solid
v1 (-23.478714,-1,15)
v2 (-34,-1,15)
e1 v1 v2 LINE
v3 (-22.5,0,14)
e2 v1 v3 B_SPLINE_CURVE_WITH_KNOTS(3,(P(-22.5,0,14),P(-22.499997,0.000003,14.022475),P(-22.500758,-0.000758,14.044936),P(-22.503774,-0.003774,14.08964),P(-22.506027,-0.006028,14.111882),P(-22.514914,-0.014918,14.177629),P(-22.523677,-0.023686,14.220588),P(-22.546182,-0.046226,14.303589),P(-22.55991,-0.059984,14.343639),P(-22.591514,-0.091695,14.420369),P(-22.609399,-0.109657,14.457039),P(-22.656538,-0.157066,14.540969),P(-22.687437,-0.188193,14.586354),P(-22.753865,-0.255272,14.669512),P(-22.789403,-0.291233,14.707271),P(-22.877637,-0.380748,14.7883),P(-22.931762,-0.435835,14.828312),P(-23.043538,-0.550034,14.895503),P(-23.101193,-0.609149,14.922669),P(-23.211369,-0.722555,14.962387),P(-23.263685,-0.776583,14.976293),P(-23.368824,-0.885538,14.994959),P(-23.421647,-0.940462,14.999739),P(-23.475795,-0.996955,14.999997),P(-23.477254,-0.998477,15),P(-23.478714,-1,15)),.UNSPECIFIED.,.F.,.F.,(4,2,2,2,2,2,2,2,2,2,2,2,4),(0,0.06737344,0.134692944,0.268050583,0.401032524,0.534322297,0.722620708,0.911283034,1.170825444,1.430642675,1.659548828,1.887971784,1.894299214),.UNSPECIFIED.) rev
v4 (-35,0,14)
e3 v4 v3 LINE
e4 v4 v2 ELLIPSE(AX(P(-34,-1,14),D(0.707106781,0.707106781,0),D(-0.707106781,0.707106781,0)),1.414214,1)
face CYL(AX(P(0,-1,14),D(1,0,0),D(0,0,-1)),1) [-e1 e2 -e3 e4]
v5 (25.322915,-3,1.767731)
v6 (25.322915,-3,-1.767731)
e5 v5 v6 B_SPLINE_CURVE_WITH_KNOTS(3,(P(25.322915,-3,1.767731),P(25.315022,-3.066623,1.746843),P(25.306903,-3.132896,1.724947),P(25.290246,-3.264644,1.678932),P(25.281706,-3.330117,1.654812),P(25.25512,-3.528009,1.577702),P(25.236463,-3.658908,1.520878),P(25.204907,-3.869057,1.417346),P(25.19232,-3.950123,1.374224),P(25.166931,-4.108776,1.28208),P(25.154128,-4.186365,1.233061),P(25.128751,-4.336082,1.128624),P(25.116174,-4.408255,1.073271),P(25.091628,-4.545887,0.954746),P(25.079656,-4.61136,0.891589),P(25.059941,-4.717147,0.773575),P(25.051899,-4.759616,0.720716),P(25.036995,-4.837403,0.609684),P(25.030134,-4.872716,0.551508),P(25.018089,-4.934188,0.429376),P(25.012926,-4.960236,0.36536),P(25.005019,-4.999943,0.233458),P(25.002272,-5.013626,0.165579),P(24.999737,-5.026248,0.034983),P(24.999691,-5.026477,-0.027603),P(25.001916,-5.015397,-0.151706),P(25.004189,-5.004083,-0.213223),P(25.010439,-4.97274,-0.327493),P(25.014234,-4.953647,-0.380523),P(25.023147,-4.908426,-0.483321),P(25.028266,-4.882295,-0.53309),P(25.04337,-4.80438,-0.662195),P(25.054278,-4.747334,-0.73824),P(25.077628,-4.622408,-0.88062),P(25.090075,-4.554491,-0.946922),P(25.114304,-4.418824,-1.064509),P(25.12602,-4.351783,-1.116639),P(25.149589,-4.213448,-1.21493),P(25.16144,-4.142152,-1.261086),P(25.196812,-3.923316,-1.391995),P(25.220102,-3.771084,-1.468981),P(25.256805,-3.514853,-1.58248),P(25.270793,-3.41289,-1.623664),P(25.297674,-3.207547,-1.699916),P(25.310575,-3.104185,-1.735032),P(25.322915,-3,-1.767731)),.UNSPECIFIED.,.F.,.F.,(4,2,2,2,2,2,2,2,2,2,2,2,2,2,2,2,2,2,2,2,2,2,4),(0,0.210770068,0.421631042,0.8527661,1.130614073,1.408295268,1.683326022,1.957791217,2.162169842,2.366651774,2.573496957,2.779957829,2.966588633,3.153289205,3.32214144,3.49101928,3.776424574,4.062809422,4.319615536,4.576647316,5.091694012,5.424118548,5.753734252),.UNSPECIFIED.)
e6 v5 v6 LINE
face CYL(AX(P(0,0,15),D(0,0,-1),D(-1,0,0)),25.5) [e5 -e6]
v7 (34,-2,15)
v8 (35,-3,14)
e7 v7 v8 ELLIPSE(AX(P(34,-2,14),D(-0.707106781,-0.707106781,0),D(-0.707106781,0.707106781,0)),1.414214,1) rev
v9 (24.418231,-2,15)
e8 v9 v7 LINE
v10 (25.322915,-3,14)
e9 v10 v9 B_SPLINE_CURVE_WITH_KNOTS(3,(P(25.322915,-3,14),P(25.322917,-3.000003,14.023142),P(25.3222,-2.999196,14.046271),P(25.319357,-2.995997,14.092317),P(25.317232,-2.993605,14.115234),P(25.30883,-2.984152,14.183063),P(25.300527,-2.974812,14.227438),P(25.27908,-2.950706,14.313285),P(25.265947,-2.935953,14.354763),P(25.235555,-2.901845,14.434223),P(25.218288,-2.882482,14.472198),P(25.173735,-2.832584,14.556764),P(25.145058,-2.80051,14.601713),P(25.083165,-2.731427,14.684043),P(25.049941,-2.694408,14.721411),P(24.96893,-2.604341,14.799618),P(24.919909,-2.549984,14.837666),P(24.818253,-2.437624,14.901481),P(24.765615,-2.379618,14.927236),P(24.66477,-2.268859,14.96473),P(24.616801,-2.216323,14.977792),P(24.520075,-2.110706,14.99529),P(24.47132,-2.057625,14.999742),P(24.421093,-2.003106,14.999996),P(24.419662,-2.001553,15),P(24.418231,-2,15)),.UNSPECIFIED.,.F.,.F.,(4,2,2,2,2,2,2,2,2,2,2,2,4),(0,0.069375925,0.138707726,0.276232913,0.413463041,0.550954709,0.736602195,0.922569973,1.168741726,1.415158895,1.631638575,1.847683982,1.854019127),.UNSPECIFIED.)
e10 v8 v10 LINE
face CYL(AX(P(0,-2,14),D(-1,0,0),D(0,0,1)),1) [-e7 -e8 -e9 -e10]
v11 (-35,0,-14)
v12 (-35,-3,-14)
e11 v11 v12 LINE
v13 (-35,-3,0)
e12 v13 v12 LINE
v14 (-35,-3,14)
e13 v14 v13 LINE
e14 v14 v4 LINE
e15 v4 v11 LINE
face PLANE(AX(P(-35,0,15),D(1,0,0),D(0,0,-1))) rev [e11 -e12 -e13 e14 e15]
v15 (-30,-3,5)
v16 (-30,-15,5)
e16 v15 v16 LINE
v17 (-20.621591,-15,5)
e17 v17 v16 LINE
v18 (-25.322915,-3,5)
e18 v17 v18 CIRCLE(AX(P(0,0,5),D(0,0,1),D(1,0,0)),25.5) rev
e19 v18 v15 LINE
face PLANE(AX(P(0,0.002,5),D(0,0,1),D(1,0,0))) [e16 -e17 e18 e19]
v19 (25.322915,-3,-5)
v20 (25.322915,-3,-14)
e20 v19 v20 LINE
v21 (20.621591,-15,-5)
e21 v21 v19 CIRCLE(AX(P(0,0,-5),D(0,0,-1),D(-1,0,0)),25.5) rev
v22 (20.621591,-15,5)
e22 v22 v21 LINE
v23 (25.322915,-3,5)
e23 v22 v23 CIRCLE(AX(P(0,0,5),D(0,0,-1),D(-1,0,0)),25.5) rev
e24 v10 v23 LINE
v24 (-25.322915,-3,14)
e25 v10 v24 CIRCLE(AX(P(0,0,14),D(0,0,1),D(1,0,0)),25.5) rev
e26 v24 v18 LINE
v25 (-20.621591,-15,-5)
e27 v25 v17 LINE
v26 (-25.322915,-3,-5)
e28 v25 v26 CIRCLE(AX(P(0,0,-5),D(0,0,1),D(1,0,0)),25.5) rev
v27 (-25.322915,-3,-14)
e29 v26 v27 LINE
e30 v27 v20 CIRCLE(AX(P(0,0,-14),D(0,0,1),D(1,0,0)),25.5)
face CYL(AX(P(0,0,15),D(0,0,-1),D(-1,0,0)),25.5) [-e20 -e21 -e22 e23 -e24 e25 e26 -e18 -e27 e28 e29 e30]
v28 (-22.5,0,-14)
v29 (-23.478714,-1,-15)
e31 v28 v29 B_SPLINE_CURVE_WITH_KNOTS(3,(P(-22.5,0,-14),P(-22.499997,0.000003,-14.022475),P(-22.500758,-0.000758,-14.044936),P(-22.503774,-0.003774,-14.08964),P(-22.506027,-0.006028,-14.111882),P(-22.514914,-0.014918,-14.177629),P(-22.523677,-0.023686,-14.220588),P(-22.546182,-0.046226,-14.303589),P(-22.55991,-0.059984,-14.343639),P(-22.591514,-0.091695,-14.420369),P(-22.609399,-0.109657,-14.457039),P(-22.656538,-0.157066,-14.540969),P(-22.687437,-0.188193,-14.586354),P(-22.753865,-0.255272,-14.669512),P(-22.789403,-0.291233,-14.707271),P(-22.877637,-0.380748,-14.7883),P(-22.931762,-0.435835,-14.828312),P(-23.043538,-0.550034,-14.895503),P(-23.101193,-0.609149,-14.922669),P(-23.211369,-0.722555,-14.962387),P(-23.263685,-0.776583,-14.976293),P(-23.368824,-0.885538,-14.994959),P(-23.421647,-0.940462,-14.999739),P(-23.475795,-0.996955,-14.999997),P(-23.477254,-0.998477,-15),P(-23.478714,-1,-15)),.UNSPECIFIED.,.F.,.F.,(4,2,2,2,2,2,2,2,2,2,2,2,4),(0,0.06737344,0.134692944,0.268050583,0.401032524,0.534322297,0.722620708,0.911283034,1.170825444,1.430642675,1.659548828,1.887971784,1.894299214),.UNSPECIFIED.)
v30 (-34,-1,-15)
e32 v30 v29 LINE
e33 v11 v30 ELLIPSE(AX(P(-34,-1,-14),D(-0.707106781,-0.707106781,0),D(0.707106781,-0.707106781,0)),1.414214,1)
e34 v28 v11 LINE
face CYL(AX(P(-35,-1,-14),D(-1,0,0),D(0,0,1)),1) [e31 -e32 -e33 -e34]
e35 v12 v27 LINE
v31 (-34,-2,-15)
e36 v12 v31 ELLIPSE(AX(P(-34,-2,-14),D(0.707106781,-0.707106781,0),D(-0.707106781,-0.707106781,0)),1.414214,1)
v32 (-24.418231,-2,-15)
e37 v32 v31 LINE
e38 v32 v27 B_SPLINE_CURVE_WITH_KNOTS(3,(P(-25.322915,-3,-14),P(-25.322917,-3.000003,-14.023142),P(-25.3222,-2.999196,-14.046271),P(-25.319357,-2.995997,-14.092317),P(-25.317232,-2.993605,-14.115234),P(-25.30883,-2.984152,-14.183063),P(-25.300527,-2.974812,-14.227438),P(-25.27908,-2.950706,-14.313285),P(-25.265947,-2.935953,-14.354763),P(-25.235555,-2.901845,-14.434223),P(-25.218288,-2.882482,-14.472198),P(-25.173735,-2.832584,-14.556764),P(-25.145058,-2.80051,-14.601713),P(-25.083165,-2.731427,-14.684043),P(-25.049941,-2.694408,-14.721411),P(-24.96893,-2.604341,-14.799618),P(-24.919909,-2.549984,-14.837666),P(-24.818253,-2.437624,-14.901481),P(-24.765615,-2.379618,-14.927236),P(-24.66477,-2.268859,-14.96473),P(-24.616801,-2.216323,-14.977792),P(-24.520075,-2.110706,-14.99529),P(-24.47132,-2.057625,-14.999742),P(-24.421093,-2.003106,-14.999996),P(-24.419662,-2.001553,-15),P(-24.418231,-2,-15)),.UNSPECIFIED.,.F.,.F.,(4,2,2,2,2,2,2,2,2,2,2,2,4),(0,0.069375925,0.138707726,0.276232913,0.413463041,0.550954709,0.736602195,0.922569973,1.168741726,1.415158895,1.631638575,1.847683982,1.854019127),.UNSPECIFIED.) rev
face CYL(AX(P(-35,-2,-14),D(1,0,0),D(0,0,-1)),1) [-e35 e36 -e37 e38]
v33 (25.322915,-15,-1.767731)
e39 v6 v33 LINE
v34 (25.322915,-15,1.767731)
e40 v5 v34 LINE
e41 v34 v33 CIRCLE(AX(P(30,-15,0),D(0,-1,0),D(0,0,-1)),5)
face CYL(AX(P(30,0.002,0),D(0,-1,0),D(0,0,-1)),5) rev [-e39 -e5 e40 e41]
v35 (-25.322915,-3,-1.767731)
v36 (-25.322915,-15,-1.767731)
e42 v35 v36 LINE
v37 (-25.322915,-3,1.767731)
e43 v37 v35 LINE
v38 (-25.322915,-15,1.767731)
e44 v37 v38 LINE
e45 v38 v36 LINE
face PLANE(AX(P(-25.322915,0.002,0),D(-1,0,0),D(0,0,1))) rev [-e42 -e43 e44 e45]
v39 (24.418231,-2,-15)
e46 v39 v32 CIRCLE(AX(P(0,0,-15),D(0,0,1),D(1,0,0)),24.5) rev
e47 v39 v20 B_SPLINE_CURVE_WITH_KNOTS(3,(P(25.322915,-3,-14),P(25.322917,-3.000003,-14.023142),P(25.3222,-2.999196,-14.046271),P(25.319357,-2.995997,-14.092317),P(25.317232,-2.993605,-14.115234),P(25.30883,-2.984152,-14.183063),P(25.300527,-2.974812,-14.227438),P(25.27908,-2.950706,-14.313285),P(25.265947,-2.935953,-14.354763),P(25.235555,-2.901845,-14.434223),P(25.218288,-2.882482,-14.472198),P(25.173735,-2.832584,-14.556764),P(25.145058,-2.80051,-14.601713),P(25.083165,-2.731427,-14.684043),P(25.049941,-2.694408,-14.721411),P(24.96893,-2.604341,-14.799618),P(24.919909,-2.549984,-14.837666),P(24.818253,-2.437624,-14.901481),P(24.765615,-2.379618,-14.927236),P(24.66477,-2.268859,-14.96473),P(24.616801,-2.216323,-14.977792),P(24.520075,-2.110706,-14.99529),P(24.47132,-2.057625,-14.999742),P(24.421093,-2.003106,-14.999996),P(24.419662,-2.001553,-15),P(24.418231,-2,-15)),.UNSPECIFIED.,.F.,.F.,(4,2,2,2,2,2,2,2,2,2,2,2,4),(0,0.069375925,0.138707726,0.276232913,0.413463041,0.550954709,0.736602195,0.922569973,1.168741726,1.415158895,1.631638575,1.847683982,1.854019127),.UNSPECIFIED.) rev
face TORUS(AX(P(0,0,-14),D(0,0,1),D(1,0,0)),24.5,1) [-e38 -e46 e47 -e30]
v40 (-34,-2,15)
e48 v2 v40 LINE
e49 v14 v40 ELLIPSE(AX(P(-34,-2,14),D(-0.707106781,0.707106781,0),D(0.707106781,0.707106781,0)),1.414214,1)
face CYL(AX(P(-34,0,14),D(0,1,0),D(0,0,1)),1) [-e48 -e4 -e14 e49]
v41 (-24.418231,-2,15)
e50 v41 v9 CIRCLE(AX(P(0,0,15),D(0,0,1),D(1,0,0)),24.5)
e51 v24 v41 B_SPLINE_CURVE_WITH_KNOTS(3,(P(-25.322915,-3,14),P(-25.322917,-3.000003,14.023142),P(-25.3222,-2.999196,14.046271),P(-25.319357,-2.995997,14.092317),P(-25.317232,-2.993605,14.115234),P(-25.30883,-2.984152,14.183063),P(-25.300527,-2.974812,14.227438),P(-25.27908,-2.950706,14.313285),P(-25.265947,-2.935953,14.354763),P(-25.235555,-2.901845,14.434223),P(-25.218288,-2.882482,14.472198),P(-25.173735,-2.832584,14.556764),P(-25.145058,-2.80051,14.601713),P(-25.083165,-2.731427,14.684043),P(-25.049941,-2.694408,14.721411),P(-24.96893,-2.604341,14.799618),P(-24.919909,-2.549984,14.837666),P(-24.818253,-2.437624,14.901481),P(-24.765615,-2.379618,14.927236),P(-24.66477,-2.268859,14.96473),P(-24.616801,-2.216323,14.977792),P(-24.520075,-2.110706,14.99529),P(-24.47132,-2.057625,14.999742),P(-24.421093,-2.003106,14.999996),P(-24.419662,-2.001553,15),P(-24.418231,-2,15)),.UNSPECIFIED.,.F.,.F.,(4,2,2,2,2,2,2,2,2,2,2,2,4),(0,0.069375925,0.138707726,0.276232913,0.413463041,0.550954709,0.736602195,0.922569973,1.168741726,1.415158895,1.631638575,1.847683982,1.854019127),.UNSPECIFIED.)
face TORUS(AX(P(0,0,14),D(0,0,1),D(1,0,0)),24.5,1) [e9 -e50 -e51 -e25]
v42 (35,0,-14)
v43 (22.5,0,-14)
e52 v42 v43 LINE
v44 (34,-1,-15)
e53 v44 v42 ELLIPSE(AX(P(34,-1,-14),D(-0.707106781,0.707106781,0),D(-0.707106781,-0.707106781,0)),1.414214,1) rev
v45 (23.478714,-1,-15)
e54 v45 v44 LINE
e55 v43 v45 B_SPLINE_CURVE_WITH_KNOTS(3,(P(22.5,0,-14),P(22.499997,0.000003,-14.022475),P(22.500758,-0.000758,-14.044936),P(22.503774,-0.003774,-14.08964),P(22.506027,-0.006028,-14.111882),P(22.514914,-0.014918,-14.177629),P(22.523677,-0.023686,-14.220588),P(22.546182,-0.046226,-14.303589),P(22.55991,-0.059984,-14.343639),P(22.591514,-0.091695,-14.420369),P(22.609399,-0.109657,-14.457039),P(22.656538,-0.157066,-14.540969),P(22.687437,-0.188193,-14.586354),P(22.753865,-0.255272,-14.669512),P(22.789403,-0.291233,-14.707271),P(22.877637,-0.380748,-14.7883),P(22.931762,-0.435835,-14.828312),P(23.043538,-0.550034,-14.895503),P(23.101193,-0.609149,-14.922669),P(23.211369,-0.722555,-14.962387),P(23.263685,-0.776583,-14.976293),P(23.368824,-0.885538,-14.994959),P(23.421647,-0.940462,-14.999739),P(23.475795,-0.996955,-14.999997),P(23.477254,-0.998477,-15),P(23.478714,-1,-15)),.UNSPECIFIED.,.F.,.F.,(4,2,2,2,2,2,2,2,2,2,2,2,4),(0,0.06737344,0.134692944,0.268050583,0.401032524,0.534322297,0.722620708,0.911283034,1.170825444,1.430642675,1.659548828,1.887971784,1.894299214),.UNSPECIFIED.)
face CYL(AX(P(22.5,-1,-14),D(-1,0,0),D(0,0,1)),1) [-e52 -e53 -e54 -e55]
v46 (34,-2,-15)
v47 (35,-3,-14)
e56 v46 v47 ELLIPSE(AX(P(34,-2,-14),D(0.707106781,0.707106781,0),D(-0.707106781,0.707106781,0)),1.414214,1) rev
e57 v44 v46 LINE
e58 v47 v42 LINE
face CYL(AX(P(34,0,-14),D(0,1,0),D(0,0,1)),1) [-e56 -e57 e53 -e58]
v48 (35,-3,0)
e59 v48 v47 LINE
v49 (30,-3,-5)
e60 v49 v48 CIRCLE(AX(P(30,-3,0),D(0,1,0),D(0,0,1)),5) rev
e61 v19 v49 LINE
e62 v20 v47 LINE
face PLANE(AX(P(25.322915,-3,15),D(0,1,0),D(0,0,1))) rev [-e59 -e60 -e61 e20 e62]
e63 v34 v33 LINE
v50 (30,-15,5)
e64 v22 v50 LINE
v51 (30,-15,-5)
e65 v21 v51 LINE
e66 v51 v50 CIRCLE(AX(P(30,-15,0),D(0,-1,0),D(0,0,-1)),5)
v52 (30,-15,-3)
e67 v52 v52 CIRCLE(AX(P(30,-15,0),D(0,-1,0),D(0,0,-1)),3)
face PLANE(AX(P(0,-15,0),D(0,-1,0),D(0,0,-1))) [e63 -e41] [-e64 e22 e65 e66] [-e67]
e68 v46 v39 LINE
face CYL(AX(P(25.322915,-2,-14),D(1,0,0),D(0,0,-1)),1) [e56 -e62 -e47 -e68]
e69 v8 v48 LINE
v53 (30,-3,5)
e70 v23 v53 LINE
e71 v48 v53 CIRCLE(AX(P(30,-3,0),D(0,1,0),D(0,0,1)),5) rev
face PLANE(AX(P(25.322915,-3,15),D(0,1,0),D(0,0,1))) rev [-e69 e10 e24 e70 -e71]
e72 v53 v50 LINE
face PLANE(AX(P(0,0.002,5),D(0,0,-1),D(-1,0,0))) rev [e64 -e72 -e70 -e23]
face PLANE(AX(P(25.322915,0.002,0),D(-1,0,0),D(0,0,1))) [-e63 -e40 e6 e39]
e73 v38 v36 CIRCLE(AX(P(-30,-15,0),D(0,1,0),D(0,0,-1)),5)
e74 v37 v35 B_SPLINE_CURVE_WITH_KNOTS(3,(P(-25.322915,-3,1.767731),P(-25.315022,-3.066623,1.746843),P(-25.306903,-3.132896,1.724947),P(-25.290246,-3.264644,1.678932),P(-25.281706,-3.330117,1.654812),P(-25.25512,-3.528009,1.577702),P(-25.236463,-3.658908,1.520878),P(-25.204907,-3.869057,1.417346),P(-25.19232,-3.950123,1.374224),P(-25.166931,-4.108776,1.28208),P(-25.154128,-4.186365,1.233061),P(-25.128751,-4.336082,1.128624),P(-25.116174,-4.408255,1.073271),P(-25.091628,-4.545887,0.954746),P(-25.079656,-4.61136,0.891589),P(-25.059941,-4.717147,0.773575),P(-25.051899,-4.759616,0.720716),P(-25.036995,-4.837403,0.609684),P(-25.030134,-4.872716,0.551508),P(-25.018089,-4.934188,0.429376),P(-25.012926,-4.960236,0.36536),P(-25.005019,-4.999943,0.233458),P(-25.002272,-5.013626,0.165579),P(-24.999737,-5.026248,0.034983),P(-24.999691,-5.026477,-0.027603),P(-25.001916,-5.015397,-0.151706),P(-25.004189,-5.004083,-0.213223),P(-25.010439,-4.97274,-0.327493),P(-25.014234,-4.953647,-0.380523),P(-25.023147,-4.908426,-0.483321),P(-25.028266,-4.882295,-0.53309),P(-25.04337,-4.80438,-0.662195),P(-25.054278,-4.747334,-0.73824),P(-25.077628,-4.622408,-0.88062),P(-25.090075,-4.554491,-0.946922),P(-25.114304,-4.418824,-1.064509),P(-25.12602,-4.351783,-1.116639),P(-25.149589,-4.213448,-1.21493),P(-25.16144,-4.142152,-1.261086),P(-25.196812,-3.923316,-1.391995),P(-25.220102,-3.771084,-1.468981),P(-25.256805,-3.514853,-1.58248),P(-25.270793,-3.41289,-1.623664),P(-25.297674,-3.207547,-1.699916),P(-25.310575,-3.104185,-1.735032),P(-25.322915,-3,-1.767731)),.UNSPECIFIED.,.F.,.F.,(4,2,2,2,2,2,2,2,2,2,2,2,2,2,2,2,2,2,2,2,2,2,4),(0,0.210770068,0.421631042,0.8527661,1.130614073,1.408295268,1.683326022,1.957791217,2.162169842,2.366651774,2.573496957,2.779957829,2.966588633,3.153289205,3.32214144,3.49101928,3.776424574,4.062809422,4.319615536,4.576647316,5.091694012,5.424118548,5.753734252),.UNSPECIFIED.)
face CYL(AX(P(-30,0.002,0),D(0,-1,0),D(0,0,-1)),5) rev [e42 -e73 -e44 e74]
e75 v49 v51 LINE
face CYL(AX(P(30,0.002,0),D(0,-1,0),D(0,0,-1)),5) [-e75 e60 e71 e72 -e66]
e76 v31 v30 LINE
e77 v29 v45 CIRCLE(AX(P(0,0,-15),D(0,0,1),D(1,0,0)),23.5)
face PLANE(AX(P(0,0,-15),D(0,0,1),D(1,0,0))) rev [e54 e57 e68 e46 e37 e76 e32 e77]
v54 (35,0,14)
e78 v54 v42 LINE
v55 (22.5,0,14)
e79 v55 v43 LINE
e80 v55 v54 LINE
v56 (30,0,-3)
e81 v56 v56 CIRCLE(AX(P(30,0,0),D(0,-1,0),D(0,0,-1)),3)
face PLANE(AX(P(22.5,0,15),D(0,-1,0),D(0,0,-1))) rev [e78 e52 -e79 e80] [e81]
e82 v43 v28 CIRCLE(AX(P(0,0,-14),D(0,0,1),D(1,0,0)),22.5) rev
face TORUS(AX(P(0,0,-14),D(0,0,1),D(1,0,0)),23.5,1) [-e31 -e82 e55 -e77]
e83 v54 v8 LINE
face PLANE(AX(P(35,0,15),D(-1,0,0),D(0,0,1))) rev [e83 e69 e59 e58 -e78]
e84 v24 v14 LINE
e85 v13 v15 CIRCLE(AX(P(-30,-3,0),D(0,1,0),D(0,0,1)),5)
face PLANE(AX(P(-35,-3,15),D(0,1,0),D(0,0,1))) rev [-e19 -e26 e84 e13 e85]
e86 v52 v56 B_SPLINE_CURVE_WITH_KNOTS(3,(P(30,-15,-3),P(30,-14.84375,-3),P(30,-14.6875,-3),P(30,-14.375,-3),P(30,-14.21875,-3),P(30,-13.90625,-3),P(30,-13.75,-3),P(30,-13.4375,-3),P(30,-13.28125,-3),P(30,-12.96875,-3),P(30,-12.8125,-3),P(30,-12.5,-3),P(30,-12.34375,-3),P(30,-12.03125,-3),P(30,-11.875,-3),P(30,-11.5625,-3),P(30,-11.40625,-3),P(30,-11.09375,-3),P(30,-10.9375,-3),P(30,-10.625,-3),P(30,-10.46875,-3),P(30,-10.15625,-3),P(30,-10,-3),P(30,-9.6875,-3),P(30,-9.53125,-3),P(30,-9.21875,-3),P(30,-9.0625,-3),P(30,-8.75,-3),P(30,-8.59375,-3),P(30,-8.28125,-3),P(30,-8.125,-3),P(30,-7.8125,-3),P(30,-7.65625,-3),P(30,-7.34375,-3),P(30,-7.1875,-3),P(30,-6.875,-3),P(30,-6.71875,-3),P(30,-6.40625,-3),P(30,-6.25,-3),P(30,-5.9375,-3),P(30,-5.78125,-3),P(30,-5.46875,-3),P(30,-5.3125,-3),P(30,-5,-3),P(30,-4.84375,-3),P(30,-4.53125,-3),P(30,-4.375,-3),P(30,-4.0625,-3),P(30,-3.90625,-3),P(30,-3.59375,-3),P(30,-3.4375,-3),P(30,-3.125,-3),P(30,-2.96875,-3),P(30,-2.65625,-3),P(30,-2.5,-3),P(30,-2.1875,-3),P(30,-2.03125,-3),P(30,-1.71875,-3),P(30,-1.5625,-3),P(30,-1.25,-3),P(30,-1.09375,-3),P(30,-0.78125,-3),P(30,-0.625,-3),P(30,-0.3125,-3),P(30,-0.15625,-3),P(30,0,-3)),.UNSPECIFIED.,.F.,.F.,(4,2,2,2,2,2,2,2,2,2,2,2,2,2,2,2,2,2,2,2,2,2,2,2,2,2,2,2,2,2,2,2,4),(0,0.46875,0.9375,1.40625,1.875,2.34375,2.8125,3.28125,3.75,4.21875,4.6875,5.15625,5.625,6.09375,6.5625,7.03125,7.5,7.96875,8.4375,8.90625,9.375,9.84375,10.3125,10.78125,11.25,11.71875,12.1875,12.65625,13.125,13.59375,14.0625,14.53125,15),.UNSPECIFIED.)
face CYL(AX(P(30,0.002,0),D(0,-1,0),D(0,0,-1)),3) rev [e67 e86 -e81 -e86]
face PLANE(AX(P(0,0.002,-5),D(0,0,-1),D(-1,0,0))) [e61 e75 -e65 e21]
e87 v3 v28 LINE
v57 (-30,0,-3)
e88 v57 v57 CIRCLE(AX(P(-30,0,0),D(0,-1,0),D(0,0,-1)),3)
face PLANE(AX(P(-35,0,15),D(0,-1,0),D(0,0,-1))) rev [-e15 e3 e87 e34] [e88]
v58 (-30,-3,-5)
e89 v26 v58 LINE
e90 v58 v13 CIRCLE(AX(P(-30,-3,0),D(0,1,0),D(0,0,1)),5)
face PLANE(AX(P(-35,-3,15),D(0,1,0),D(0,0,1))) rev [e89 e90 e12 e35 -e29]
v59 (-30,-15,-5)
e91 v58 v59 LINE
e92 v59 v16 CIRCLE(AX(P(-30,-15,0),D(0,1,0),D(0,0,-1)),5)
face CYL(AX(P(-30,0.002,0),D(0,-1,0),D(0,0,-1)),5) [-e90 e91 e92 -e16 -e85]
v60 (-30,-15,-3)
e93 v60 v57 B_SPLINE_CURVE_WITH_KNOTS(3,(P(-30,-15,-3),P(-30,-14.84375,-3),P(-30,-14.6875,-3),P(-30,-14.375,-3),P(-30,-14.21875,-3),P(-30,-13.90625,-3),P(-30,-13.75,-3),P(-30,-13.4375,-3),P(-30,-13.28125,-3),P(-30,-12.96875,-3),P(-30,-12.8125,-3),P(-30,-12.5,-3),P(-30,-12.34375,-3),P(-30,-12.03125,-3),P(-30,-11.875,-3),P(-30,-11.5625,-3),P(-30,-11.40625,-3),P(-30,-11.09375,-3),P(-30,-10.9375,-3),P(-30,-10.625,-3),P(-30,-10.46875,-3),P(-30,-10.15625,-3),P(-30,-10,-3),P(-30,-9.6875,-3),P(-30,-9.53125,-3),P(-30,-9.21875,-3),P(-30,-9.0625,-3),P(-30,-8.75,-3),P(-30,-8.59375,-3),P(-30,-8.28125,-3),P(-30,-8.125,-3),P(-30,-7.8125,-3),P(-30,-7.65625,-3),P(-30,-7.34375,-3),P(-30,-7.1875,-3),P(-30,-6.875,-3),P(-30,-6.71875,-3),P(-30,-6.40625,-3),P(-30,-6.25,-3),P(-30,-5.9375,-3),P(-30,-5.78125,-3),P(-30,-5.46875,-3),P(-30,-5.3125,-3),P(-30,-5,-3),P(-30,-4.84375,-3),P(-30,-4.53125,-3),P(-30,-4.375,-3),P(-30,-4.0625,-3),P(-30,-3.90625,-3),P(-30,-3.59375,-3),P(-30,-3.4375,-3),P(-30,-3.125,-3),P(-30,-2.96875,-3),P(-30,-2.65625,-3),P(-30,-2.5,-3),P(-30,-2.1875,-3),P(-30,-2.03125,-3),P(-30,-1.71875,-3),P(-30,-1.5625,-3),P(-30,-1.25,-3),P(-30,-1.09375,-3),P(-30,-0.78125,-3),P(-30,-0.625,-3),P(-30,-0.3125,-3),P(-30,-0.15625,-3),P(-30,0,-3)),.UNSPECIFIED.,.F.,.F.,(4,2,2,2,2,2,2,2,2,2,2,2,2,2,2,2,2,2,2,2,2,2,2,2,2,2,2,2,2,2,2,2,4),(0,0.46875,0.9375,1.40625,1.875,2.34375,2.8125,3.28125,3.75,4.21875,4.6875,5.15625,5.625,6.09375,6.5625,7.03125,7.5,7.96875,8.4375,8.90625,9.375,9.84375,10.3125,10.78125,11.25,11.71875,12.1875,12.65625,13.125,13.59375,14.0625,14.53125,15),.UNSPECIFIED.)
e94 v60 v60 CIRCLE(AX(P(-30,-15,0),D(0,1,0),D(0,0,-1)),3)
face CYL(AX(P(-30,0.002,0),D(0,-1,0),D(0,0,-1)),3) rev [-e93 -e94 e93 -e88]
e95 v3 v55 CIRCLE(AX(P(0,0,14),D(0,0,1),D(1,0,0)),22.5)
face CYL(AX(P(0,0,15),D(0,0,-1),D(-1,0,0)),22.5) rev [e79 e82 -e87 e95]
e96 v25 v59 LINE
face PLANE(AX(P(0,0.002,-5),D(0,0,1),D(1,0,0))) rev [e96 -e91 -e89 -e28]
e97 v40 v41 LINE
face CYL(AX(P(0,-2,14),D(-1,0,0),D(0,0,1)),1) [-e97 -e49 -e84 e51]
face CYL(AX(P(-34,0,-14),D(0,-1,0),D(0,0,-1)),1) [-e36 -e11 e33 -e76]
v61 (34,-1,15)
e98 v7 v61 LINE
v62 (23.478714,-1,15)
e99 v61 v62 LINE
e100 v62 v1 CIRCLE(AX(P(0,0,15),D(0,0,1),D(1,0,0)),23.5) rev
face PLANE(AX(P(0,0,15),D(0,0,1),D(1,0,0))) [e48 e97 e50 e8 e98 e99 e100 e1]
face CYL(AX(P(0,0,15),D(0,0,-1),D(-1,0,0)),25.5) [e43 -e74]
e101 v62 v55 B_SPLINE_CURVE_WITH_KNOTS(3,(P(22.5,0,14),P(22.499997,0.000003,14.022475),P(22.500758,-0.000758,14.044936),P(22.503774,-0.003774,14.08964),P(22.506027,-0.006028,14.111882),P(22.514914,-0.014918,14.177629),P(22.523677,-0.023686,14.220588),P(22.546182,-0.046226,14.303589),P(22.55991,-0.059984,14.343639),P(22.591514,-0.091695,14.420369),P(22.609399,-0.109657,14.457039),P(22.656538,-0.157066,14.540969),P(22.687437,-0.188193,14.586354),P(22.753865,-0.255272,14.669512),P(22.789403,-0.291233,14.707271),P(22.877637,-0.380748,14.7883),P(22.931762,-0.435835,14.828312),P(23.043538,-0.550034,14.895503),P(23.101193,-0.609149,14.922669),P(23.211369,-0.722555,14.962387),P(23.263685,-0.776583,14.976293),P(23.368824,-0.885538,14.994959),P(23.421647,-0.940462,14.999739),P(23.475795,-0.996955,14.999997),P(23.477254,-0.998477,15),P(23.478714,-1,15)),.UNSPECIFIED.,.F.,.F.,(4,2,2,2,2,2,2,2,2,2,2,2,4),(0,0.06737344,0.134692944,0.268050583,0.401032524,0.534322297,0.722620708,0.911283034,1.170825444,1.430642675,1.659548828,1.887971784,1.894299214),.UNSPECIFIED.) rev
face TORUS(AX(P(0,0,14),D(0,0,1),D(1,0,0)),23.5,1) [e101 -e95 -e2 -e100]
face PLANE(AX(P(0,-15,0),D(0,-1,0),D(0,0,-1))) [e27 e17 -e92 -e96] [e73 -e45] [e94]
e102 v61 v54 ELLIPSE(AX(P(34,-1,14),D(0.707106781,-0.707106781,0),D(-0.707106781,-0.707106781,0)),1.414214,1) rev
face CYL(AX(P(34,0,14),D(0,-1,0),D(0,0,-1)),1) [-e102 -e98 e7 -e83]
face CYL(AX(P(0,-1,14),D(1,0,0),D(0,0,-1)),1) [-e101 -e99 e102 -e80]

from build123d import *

# Parameters (mm, degrees)
BOSS_EXTRUDE1_DEPTH = 15
BOSS_EXTRUDE2_REACH = 58.23
BOSS_EXTRUDE2_START = 12
SKETCH4_R           = 3
FILLET1_R           = 1
SKETCH4_4_R         = 3
CUT_EXTRUDE1_DEPTH  = 45.229515196
SKETCH5_R           = 3
CUT_EXTRUDE2_DEPTH  = 41.926764018


with BuildPart() as part:
    # Sketch2 → Boss-Extrude1 (new, symmetric)
    with BuildSketch(Plane.XY):
        with BuildLine():
            Line((-35, 0), (-22.5, 0))
            ThreePointArc((-22.5, 0), (0, -22.5), (22.5, 0))
            Line((22.5, 0), (35, 0))
            Line((35, 0), (35, -3))
            Line((35, -3), (25.322914524, -3))
            ThreePointArc((25.322914524, -3), (0, -25.5), (-25.322914524, -3))
            Line((-25.322914524, -3), (-35, -3))
            Line((-35, -3), (-35, 0))
        make_face()
    extrude(amount=BOSS_EXTRUDE1_DEPTH, both=True)

    # Sketch4 → Boss-Extrude2 (add, up to next)
    with BuildSketch(Plane.XZ.offset(3).offset(BOSS_EXTRUDE2_START), mode=Mode.PRIVATE) as boss_extrude2_sk1:
        with BuildLine():
            Line((18, 5), (18, -5))
            Line((18, -5), (30, -5))
            ThreePointArc((30, -5), (35, 0), (30, 5))
            Line((30, 5), (18, 5))
        make_face()
        with BuildLine():
            ThreePointArc((25.322914524, -1.767730594), (25, 0), (25.322914524, 1.767730594))
            Line((25.322914524, 1.767730594), (25.322914524, -1.767730594))
        make_face(mode=Mode.SUBTRACT)
        with Locations((30, 0)):
            Circle(SKETCH4_R, mode=Mode.SUBTRACT)
    boss_extrude2_tool1 = extrude(boss_extrude2_sk1.sketch, amount=-BOSS_EXTRUDE2_REACH, mode=Mode.PRIVATE) - part.part
    boss_extrude2 = boss_extrude2_tool1.solids().sort_by_distance((24, -15, 4.802769))[0]
    add(boss_extrude2)

    # Fillet1
    fillet1_edges = [part.edges().sort_by_distance(p)[0] for p in [
        (-30.161457262, -3, -15),
        (0, -25.5, -15),
        (30.161457262, -3, -15),
        (35, -1.5, -15),
        (28.75, 0, -15),
        (0, -22.5, -15),
        (-28.75, 0, -15),
        (-35, -1.5, -15),
        (-28.75, 0, 15),
        (0, -22.5, 15),
        (28.75, 0, 15),
        (35, -1.5, 15),
        (30.161457262, -3, 15),
        (0, -25.5, 15),
        (-30.161457262, -3, 15),
        (-35, -1.5, 15),
    ]]
    fillet(fillet1_edges, radius=FILLET1_R)

    # Sketch4<4> → Cut-Extrude1 (cut, through all)
    with BuildSketch(Plane.XZ.offset(3)):
        with Locations((30, 0)):
            Circle(SKETCH4_4_R)
    extrude(amount=-CUT_EXTRUDE1_DEPTH, mode=Mode.SUBTRACT)

    # Mirror1: Boss-Extrude2 across plane
    add(boss_extrude2.mirror(Plane(origin=(0, 0, 0), x_dir=(0, 0, 1), z_dir=(1, 0, 0))))

    # Sketch5 → Cut-Extrude2 (cut, through all)
    with BuildSketch(Plane.XZ.offset(15)):
        with Locations((-30, 0)):
            Circle(SKETCH5_R)
    extrude(amount=-CUT_EXTRUDE2_DEPTH, mode=Mode.SUBTRACT)


solid = part.part
